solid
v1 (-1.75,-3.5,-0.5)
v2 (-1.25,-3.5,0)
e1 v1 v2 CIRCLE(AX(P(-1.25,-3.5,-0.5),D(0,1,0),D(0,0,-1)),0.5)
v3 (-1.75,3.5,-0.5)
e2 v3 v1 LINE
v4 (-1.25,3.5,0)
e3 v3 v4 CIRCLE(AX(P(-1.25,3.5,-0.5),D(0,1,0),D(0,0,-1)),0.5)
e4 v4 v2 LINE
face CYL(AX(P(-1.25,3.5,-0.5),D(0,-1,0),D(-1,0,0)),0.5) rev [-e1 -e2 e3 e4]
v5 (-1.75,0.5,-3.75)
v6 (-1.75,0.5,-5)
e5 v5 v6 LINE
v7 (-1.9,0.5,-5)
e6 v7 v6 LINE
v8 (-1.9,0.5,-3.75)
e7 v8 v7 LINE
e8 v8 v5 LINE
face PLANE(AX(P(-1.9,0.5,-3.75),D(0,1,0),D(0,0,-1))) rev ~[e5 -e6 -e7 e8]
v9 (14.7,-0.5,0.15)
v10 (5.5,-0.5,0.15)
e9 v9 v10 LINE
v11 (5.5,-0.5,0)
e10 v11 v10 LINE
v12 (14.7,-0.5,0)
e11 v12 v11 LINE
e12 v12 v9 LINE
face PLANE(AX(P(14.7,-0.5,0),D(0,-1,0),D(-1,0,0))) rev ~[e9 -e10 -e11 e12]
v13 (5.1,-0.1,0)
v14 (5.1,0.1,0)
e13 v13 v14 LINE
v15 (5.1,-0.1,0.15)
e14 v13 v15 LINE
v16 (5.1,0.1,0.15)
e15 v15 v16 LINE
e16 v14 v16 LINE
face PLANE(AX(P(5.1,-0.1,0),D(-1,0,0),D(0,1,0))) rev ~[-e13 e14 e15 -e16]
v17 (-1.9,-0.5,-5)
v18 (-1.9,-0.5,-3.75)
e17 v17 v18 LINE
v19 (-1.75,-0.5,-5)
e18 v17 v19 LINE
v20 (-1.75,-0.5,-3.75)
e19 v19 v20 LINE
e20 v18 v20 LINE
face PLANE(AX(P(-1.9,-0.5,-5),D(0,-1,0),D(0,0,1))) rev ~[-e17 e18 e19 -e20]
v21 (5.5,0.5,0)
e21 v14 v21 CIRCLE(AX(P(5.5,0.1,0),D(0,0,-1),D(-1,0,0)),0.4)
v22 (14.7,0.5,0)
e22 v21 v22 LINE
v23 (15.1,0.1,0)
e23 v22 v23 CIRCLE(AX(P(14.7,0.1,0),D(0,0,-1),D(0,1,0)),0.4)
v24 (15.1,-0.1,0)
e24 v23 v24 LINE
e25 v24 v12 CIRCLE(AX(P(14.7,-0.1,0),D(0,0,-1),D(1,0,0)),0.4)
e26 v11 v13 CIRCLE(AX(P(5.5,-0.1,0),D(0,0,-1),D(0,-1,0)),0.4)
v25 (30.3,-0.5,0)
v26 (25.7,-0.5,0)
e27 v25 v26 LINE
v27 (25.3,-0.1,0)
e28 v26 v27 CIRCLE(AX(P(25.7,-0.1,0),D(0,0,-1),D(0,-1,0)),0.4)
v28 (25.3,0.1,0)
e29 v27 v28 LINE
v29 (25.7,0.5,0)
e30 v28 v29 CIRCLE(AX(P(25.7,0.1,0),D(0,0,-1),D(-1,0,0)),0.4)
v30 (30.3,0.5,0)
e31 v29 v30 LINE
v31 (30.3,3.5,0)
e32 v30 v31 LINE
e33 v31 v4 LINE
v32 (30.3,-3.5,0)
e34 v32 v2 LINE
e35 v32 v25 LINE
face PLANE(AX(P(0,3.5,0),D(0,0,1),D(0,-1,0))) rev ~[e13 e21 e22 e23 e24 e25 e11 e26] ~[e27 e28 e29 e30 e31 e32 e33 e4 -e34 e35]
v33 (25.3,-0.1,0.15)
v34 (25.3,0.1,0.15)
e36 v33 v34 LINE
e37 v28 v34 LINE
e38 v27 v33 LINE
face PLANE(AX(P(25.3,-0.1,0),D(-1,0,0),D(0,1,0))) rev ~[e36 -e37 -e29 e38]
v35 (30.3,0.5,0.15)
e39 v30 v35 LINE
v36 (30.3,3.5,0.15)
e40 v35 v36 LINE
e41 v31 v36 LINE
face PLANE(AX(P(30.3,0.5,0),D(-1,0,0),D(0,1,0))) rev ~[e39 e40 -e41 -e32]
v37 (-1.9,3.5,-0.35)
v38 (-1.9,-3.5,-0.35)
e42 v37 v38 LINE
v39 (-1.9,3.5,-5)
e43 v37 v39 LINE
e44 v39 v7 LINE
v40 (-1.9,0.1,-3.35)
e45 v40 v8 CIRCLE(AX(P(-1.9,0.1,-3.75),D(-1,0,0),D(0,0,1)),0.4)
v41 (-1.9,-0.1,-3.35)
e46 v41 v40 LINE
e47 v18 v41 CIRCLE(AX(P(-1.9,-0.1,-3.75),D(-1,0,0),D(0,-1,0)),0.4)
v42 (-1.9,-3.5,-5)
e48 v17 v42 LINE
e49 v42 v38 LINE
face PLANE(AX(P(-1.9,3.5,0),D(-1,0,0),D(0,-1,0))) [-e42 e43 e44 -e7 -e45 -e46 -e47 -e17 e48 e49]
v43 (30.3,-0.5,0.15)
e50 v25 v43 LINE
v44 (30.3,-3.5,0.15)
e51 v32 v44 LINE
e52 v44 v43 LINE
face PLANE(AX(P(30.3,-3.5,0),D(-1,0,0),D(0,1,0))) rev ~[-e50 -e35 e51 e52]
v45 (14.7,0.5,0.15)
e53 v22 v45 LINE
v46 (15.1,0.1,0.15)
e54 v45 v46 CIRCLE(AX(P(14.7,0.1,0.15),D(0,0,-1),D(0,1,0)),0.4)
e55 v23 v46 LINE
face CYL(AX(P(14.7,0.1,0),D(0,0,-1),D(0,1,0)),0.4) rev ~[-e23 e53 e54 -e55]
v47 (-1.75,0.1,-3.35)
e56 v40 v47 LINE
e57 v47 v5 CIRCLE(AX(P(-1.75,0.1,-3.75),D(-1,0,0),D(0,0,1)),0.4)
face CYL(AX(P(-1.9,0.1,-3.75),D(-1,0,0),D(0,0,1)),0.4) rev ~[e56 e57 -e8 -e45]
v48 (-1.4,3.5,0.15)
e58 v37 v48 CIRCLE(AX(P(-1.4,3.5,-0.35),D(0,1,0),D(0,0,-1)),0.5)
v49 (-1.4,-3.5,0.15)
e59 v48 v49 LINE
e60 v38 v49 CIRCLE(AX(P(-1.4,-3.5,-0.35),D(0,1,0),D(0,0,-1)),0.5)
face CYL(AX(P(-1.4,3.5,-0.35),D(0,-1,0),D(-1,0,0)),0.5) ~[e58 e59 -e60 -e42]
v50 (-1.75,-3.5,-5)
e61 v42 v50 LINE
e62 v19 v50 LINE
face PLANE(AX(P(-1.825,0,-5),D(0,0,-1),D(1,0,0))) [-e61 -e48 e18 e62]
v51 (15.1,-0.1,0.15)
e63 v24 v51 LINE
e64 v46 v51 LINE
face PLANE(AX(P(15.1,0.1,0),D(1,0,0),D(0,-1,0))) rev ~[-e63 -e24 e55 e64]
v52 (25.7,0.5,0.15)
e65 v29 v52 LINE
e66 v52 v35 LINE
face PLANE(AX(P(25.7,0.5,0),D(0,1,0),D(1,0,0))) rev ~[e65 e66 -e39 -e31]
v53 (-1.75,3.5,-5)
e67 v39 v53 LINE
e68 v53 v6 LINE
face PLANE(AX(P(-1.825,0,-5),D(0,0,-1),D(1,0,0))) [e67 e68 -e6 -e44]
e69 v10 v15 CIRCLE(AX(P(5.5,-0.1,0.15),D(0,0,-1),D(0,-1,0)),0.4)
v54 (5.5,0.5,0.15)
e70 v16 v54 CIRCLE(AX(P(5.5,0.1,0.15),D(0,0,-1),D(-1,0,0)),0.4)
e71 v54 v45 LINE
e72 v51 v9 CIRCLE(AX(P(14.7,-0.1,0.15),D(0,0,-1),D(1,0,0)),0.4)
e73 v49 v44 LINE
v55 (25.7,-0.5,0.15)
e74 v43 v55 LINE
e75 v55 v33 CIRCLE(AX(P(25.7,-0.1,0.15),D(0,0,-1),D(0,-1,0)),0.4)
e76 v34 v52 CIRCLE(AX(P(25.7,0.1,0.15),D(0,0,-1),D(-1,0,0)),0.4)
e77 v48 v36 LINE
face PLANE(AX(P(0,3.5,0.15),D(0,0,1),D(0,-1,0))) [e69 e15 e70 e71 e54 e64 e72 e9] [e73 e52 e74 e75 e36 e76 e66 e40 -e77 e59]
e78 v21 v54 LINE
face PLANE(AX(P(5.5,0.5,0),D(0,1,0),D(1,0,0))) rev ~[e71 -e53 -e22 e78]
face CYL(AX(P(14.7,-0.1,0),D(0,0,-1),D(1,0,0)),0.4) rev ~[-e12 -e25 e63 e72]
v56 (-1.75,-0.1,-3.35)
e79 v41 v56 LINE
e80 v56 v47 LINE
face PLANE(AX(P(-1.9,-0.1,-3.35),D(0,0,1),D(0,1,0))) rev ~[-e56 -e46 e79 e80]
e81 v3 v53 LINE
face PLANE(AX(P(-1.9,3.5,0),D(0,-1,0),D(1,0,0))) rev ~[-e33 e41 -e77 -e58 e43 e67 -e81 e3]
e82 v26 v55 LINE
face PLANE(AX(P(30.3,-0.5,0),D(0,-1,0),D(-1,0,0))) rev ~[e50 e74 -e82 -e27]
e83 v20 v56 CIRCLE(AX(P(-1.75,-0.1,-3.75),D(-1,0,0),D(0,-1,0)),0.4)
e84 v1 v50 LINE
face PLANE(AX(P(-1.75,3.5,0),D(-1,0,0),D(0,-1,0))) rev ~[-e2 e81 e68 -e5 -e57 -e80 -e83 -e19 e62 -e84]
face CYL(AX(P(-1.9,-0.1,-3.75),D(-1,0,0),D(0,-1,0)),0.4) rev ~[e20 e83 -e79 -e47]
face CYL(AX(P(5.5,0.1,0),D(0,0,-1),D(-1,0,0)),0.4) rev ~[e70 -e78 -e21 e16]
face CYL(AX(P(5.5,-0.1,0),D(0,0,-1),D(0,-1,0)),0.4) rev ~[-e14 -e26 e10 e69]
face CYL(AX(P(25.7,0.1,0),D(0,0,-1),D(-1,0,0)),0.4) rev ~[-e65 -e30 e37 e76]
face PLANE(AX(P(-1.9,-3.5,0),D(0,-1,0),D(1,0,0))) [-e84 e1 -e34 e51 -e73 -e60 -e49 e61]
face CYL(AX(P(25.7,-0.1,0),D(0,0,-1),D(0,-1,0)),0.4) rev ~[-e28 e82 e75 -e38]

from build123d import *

# Parameters (mm, degrees)
F1_DEPTH = 0.15
F2_DEPTH = 1.9
F3_W     = 0.15
F3_H     = 7
F4_DEPTH = 5
F6_DEPTH = 25
F7_R     = 0.5


# Not quite as in the source:
# - a feature names something its author has since deleted; it is built from what else it names


with BuildPart() as f1:
    # F0 (on Top) → F1 (new body)
    with BuildSketch(Plane.XY):
        with BuildLine():
            Line((10.1, -0.5), (10.1, -3.5))
            Line((10.1, -3.5), (20.2, -3.5))
            Line((20.2, -3.5), (30.3, -3.5))
            Line((30.3, -3.5), (30.3, -0.5))
            Line((30.3, -0.5), (25.7, -0.5))
            ThreePointArc((25.7, -0.5), (25.4171572875, -0.3828427125), (25.3, -0.1))
            Line((25.3, -0.1), (25.3, 0.1))
            ThreePointArc((25.3, 0.1), (25.4171572875, 0.3828427125), (25.7, 0.5))
            Line((25.7, 0.5), (30.3, 0.5))
            Line((30.3, 0.5), (30.3, 3.5))
            Line((30.3, 3.5), (20.2, 3.5))
            Line((20.2, 3.5), (10.1, 3.5))
            Line((10.1, 3.5), (10.1, 0.5))
            Line((10.1, 0.5), (14.7, 0.5))
            ThreePointArc((14.7, 0.5), (14.9828427125, 0.3828427125), (15.1, 0.1))
            Line((15.1, 0.1), (15.1, -0.1))
            ThreePointArc((15.1, -0.1), (14.9828427125, -0.3828427125), (14.7, -0.5))
            Line((14.7, -0.5), (10.1, -0.5))
        make_face()
        with BuildLine():
            Line((0, 3.5), (0, -3.5))
            Line((0, -3.5), (10.1, -3.5))
            Line((10.1, -3.5), (10.1, -0.5))
            Line((10.1, -0.5), (5.5, -0.5))
            ThreePointArc((5.5, -0.5), (5.2171572875, -0.3828427125), (5.1, -0.1))
            Line((5.1, -0.1), (5.1, 0.1))
            ThreePointArc((5.1, 0.1), (5.2171572875, 0.3828427125), (5.5, 0.5))
            Line((5.5, 0.5), (10.1, 0.5))
            Line((10.1, 0.5), (10.1, 3.5))
            Line((10.1, 3.5), (0, 3.5))
        make_face()
    extrude(amount=F1_DEPTH)

    # F2 (add): a face of the model
    f2_faces = [f1.faces().sort_by_distance(p)[0] for p in [
        (0, 0, 0.075),
    ]]
    extrude(f2_faces, amount=F2_DEPTH)

    # F3 (on face) → F4 (join)
    with BuildSketch(Plane(origin=(0, 0, 0), x_dir=(1, 0, 0), z_dir=(0, 0, -1))):
        with Locations((-1.825, 0)):
            Rectangle(F3_W, F3_H)
    extrude(amount=F4_DEPTH)

    # F5 (on face) → F6 (cut)
    with BuildSketch(Plane(origin=(-1.9, 0, 0), x_dir=(0, -1, 0), z_dir=(-1, 0, 0))):
        with BuildLine():
            ThreePointArc((0.5, -3.75), (0.3828427125, -3.4671572875), (0.1, -3.35))
            Line((0.1, -3.35), (-0.1, -3.35))
            ThreePointArc((-0.1, -3.35), (-0.3828427125, -3.4671572875), (-0.5, -3.75))
            Line((-0.5, -3.75), (-0.5, -5))
            Line((-0.5, -5), (0.5, -5))
            Line((0.5, -5), (0.5, -3.75))
        make_face()
    extrude(amount=-F6_DEPTH, mode=Mode.SUBTRACT)

    # F7
    f7_edges = [f1.edges().sort_by_distance(p)[0] for p in [
        (-1.9, 0, 0.15),
        (-1.75, 0, 0),
    ]]
    fillet(f7_edges, radius=F7_R)


solid = f1.part
